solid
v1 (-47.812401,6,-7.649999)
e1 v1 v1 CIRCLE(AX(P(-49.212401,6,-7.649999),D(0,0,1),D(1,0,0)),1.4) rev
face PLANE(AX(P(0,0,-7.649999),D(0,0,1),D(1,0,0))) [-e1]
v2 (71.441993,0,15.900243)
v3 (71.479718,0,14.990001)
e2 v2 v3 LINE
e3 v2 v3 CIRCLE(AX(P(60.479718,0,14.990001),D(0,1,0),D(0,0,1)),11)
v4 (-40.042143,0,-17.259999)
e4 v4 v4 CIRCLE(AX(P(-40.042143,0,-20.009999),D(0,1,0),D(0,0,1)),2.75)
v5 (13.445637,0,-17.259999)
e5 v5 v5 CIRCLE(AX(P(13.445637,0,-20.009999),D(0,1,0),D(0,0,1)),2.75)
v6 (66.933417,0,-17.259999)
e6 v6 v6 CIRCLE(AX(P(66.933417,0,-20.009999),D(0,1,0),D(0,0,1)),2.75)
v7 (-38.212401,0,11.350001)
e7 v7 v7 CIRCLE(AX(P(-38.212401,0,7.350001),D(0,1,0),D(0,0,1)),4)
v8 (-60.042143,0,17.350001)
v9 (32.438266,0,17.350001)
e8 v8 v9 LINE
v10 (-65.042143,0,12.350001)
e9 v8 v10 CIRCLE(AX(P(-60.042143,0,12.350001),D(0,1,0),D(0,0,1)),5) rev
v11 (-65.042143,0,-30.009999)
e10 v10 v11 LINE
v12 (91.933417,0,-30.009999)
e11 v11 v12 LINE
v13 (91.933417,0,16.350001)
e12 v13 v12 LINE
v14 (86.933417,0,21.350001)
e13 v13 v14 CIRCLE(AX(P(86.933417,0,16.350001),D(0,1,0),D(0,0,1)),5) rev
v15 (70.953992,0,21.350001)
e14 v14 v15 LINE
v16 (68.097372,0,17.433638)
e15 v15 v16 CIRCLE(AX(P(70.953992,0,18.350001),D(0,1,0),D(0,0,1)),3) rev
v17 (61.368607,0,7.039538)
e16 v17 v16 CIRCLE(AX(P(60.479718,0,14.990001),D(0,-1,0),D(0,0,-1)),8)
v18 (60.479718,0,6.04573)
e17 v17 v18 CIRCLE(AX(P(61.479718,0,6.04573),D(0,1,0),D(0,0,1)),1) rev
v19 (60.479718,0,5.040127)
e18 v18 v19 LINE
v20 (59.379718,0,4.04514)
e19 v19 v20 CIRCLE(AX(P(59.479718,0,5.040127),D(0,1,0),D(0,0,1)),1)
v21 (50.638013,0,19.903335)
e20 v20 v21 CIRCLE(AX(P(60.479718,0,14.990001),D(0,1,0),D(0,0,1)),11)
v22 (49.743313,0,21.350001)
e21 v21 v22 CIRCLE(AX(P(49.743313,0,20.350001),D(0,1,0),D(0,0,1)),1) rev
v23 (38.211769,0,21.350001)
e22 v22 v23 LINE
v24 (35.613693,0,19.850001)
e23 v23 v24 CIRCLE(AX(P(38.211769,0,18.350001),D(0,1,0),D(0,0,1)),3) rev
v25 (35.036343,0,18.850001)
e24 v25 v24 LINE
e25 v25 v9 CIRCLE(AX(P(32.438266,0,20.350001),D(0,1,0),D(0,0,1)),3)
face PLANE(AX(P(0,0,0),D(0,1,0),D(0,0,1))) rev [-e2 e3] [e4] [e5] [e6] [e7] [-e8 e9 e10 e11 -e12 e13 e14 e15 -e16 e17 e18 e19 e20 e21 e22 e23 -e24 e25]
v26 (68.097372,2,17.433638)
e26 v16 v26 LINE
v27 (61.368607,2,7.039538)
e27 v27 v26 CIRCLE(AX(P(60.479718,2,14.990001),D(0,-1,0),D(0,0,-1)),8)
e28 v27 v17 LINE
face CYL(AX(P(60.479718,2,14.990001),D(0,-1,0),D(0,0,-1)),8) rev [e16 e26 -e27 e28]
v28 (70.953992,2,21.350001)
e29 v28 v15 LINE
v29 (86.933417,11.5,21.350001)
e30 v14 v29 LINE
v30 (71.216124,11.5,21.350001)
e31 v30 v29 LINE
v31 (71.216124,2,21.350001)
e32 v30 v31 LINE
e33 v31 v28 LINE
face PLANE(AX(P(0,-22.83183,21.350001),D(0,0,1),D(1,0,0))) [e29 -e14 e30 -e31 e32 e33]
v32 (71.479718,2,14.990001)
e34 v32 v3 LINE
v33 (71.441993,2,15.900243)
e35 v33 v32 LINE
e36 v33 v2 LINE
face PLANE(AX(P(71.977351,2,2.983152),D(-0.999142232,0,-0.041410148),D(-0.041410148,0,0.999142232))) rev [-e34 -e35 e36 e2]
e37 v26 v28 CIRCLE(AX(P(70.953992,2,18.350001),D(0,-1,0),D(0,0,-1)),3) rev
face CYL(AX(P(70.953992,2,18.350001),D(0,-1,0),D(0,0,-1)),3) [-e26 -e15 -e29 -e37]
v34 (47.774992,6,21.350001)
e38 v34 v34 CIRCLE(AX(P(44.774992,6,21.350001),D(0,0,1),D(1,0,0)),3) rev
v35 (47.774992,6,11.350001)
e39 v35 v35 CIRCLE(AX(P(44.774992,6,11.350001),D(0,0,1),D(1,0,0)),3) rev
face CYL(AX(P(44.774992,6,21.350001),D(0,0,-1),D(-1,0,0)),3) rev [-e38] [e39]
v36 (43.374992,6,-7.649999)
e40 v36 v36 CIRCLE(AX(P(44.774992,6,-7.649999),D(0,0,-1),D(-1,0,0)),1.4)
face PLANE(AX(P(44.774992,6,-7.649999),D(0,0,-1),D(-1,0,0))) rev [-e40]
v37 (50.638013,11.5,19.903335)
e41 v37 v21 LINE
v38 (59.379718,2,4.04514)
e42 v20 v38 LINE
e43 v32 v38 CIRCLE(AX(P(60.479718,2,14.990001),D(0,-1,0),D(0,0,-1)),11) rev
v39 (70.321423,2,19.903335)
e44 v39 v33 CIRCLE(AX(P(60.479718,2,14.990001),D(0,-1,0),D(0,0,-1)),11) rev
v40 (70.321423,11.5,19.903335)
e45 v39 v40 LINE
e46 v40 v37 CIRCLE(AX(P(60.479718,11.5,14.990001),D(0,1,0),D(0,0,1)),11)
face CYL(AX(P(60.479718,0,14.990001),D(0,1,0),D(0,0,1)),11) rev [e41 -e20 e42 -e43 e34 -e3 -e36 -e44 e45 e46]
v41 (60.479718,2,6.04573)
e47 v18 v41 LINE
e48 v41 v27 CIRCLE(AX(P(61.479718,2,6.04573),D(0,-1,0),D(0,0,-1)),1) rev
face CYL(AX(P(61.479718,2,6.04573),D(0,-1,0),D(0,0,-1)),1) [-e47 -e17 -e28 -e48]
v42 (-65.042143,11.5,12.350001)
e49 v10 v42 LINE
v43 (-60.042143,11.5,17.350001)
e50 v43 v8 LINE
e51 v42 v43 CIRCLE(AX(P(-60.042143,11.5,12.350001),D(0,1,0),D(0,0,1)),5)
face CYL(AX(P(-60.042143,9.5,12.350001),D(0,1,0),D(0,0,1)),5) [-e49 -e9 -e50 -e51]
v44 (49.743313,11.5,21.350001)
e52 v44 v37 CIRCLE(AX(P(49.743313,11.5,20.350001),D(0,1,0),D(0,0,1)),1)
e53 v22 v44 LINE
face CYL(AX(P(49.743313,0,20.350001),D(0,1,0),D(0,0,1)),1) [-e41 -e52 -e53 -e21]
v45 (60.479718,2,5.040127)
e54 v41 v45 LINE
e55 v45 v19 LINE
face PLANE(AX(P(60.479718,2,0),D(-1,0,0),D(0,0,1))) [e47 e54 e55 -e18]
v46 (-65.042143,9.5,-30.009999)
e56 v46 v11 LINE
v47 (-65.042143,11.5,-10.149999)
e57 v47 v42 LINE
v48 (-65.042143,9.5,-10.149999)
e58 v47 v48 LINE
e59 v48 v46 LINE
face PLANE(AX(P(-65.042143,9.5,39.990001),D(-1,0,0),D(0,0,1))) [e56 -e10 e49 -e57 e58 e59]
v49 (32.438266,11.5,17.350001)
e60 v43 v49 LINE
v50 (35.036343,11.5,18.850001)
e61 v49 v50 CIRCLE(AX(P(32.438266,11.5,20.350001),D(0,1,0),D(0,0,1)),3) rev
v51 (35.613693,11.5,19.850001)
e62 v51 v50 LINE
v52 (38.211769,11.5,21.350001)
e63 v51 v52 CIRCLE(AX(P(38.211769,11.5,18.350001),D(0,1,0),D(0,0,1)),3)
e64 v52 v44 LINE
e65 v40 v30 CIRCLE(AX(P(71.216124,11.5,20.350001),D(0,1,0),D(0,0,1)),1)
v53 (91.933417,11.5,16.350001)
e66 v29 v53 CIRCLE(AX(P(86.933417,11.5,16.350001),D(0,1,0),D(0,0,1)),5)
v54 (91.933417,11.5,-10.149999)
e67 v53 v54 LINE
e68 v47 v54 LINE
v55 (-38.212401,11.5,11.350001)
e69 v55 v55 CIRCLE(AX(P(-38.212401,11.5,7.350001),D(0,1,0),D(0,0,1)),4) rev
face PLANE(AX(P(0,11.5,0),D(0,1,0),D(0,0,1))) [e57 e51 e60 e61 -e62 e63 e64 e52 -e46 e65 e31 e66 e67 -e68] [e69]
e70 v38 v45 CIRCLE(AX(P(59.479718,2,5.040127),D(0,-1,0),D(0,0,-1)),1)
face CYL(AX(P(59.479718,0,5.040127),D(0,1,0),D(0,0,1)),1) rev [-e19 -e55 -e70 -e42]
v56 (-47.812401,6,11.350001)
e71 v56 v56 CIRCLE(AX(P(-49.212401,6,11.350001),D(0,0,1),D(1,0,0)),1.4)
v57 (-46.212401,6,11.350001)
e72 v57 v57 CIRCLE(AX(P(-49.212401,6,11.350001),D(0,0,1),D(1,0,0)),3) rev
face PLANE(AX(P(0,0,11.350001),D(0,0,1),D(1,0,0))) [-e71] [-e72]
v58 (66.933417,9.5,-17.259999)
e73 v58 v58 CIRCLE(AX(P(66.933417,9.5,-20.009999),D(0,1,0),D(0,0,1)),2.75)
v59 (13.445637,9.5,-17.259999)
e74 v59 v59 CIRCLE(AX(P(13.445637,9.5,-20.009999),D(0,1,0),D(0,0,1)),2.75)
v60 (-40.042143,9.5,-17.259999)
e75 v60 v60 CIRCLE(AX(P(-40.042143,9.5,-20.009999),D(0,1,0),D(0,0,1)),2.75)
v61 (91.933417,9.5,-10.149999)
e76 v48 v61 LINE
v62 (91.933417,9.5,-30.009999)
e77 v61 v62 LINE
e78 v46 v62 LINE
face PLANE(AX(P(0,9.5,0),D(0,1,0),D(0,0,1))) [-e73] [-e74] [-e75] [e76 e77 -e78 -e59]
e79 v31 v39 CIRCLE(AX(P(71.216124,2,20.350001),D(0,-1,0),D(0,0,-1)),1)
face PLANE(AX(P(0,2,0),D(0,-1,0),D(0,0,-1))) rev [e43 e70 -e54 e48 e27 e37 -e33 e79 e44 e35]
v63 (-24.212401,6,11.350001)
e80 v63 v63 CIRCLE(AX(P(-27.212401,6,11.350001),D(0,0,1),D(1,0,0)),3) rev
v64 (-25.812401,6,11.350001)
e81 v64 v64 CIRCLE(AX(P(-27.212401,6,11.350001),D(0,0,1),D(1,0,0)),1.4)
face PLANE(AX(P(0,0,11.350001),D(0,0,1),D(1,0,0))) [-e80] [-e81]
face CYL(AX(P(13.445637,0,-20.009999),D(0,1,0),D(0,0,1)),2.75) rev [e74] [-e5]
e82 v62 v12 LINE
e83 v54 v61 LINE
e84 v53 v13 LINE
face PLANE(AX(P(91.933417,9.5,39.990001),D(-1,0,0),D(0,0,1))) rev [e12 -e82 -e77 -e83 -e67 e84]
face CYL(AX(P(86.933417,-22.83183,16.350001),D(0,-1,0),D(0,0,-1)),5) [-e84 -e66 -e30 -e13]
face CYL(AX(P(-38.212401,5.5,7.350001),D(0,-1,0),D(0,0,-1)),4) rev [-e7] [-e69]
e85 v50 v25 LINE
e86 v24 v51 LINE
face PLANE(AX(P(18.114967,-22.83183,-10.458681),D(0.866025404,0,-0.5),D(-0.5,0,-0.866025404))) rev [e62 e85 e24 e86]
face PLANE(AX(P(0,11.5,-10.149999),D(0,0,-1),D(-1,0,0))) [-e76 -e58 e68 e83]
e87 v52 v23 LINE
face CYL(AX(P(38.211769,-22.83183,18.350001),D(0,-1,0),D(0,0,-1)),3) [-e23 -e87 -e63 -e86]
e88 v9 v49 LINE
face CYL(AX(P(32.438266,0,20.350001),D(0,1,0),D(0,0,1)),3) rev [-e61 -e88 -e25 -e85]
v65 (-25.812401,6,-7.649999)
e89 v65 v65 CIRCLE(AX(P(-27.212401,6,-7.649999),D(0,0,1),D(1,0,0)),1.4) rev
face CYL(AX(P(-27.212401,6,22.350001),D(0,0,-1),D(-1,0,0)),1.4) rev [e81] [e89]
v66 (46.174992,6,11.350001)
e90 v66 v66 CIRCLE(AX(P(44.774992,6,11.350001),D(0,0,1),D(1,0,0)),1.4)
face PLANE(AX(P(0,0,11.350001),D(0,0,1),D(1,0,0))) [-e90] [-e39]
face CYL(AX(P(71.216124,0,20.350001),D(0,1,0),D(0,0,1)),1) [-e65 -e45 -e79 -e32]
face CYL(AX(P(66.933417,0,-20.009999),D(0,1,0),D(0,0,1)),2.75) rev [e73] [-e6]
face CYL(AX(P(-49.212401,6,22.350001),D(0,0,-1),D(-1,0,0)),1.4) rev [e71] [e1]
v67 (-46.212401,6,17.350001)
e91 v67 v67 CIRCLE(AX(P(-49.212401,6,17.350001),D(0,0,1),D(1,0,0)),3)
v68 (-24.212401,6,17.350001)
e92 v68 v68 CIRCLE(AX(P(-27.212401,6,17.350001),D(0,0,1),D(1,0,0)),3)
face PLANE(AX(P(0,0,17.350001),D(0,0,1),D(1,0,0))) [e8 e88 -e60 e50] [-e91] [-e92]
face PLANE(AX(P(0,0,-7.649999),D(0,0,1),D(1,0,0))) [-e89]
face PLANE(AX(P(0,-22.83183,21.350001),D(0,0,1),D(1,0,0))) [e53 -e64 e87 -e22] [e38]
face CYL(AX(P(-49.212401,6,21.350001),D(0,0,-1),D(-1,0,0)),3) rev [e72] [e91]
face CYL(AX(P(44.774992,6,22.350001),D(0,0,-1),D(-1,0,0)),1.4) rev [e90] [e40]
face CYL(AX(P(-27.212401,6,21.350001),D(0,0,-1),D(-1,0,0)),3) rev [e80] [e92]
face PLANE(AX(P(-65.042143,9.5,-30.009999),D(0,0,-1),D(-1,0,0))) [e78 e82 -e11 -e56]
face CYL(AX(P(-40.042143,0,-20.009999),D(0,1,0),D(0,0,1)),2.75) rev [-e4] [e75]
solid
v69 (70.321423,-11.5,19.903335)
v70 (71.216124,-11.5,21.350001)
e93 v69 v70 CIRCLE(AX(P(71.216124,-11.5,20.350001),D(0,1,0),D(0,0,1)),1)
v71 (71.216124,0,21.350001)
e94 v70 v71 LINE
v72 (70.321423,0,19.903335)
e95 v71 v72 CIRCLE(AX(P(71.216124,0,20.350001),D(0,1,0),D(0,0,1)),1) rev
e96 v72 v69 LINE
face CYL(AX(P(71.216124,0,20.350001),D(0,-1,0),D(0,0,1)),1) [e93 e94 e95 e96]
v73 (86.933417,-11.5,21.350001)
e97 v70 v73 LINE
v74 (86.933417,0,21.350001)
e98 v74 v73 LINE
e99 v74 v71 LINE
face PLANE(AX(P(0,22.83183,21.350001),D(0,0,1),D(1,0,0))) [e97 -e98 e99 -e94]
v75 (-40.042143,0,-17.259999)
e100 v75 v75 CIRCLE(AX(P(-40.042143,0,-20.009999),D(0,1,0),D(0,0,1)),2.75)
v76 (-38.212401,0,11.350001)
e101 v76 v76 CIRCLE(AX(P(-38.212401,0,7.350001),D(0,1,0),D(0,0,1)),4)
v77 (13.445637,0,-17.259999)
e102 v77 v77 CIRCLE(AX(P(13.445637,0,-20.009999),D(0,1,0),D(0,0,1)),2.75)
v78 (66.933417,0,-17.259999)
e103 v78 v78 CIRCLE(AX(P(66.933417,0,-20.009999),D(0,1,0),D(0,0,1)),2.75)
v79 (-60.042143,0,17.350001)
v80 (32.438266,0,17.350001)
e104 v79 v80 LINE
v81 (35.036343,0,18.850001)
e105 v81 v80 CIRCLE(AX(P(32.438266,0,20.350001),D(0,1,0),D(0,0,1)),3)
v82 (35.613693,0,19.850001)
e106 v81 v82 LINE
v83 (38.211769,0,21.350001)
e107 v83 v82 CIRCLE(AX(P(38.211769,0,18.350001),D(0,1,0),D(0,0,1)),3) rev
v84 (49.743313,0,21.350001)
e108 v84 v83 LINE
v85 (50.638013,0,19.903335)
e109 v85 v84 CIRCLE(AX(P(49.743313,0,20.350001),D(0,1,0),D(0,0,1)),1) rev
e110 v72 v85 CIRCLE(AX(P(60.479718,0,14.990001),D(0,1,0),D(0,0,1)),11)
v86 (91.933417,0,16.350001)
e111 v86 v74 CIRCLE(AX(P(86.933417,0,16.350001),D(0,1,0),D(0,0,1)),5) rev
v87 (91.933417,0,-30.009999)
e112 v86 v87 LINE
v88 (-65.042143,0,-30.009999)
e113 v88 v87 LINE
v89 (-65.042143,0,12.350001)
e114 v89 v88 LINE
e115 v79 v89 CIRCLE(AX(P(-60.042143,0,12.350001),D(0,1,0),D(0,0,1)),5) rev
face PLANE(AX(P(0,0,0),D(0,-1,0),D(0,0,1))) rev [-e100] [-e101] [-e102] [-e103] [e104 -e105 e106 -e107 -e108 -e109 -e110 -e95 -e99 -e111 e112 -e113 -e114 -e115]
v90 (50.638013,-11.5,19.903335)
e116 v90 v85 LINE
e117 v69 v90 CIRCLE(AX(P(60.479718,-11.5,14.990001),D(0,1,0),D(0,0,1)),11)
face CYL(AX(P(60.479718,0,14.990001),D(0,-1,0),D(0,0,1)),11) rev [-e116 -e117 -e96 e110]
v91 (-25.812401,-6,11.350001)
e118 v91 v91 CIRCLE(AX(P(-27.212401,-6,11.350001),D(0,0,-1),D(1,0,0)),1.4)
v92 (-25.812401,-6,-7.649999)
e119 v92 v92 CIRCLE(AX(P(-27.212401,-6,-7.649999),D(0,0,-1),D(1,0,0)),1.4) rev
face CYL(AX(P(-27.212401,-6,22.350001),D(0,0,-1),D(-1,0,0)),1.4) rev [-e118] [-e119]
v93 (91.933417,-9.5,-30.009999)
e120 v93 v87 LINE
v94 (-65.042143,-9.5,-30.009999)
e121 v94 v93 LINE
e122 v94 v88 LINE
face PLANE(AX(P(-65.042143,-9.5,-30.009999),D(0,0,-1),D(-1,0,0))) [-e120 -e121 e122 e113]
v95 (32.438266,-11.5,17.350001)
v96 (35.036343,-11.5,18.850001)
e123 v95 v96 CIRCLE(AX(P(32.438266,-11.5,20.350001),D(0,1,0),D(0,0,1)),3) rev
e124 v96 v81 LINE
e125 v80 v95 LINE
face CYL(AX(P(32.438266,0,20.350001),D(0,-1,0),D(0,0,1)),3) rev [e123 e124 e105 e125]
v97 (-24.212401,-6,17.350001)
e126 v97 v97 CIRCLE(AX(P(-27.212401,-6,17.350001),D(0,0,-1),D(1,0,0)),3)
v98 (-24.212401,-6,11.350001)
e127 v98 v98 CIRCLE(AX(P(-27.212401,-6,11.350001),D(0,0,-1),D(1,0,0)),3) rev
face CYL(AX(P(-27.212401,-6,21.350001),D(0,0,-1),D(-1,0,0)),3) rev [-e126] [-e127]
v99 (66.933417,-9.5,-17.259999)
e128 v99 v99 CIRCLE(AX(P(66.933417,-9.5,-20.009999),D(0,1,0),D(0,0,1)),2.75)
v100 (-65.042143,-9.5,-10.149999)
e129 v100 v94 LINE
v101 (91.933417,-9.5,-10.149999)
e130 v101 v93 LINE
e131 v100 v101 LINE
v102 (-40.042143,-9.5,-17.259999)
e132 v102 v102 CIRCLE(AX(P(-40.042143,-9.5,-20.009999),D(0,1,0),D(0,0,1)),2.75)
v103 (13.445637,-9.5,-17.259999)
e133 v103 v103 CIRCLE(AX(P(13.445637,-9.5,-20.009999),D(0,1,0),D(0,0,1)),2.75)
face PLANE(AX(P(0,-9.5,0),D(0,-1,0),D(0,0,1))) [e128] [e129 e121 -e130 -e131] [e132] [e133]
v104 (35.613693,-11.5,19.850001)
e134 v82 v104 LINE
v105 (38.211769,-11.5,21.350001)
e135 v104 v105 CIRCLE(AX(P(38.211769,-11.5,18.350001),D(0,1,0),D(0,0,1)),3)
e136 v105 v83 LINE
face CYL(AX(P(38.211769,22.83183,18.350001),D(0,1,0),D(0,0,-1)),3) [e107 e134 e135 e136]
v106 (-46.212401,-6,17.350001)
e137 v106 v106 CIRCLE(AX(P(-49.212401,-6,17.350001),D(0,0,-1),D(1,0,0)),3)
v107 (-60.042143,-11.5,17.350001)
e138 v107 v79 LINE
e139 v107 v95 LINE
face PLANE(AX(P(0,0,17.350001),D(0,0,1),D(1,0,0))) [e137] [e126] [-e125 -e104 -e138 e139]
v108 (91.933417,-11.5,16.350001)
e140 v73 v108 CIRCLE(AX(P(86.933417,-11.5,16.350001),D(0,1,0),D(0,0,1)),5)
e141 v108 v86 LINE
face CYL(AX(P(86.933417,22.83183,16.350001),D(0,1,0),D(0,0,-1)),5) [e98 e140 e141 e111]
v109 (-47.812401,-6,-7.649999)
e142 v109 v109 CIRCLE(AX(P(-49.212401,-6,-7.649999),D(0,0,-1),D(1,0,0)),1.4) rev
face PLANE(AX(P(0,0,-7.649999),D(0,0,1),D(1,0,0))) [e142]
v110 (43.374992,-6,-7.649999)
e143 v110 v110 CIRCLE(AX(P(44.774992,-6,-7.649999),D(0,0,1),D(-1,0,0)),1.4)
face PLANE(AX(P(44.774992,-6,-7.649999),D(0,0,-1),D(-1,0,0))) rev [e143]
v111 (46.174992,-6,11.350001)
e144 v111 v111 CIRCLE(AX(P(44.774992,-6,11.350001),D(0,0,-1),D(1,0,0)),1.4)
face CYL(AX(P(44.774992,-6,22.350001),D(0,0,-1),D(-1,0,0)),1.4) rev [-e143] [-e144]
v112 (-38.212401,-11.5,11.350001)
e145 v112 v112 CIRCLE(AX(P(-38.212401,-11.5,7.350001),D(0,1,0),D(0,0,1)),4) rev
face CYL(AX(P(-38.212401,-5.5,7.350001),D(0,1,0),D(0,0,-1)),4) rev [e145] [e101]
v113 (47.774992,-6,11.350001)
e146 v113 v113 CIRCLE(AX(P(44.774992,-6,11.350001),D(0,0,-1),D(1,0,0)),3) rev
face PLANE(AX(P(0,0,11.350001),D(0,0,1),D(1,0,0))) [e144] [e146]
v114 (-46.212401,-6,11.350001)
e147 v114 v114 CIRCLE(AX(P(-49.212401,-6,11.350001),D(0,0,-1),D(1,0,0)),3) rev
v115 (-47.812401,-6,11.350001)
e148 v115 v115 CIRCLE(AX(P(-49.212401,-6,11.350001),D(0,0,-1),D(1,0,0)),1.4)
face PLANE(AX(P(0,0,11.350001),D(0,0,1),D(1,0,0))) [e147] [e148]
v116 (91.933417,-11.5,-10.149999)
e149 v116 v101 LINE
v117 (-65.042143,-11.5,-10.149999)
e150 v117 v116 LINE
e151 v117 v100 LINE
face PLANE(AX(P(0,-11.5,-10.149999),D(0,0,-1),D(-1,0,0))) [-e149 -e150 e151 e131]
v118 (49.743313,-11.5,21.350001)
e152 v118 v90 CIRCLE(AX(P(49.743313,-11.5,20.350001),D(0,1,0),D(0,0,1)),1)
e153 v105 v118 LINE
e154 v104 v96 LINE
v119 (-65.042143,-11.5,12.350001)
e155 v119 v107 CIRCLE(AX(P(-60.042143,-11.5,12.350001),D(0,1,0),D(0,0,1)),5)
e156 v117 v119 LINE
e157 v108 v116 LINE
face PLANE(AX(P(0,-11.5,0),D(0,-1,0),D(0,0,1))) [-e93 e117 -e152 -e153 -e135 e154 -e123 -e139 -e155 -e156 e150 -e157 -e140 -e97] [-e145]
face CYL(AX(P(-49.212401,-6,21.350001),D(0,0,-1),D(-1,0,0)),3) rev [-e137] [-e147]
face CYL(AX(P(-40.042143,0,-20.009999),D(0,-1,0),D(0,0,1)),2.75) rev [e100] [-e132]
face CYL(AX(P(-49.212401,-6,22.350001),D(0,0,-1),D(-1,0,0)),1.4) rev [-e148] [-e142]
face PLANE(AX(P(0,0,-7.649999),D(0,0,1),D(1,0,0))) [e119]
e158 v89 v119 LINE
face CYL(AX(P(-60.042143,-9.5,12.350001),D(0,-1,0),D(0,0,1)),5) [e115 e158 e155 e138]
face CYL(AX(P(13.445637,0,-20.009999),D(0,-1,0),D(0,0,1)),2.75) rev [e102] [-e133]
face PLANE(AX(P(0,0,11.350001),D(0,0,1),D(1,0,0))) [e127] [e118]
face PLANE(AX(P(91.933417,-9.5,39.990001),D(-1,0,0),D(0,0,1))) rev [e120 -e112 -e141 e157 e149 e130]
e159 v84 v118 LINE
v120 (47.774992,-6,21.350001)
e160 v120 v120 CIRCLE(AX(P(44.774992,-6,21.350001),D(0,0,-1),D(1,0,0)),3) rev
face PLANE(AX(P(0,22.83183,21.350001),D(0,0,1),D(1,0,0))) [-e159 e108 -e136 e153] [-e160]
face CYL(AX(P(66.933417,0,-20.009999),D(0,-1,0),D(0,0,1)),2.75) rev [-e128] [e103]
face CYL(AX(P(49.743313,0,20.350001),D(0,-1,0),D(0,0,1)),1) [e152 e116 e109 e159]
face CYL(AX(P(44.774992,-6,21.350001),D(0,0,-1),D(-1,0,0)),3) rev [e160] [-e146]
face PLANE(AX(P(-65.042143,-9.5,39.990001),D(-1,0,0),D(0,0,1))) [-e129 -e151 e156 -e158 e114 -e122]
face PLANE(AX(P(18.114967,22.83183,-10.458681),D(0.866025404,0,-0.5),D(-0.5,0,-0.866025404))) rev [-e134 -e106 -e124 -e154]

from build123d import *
from build123d.topology import SkipClean

# Parameters (mm, degrees)
SKETCH1_R                = 10
SKETCH1_R_2              = 4
BOSS_EXTRUDE1_DEPTH      = 5.5
BOSS_EXTRUDE2_START      = -9.5
BOSS_EXTRUDE2_OUTLINE_W  = 156.975559889
BOSS_EXTRUDE2_OUTLINE_H  = 70
BOSS_EXTRUDE2_OUTLINE_R  = 4
BOSS_EXTRUDE2_DEPTH      = 9.5
BOSS_EXTRUDE3_START      = -2
BOSS_EXTRUDE3_OUTLINE_W  = 156.975559889
BOSS_EXTRUDE3_OUTLINE_H  = 50.14
BOSS_EXTRUDE3_OUTLINE_R  = 4
BOSS_EXTRUDE3_DEPTH      = 2
SKETCH3_R                = 11
CUT_EXTRUDE1_DEPTH       = 101.911859603
SKETCH10_R               = 2.75
CUT_EXTRUDE43_DEPTH      = 101.703542185
CUT_EXTRUDE48_START      = 10
SKETCH13_W               = 179.362080376
SKETCH13_H               = 98.006622084
CUT_EXTRUDE48_DEPTH      = 30
BOSS_EXTRUDE4_DEPTH      = 11.5
CUT_EXTRUDE42_START      = -4
SKETCH8_R                = 3
SKETCH8_R_2              = 1.4
CUT_EXTRUDE42_DEPTH      = 347.611394255
CUT_EXTRUDE44_DEPTH      = 15
CUT_EXTRUDE44_DEPTH_BACK = 15
SKETCH8_3_R              = 1.4
FILLET2_R                = 3
FILLET3_R                = 1
FILLET4_R                = 5
BOSS_EXTRUDE5_START      = -2
BOSS_EXTRUDE5_DEPTH      = 2
FILLET5_R                = 3
FILLET6_R                = 1


# Read off the part's stored shape, not the designer's step: Boss-Extrude2, Boss-Extrude3
with BuildPart() as part:
    # Sketch1 → Boss-Extrude1 (new body)
    with BuildSketch(Plane(origin=(0, 0, 0), x_dir=(1, 0, 0), z_dir=(0, 1, 0))):
        with Locations(Location((-38.212401265, -7.350001428, 0), (0, 0, 270))):
            Circle(SKETCH1_R)
        with Locations(Location((-38.212401265, -7.350001428, 0), (0, 0, 270))):
            Circle(SKETCH1_R_2, mode=Mode.SUBTRACT)
    extrude(amount=BOSS_EXTRUDE1_DEPTH)

    # Boss-Extrude2 outline → Boss-Extrude2 (add)
    with BuildSketch(Plane.XZ.offset(BOSS_EXTRUDE2_START)):
        with Locations((13.445637236, 4.990001428)):
            Rectangle(BOSS_EXTRUDE2_OUTLINE_W, BOSS_EXTRUDE2_OUTLINE_H)
        with Locations((-38.212401265, 7.350001428)):
            Circle(BOSS_EXTRUDE2_OUTLINE_R, mode=Mode.SUBTRACT)
    extrude(amount=BOSS_EXTRUDE2_DEPTH)

    # Boss-Extrude3 outline → Boss-Extrude3 (add)
    with BuildSketch(Plane.XZ.offset(-9.5).offset(BOSS_EXTRUDE3_START)):
        with Locations((13.445637236, 14.920001428)):
            Rectangle(BOSS_EXTRUDE3_OUTLINE_W, BOSS_EXTRUDE3_OUTLINE_H)
        with Locations((-38.212401265, 7.350001428)):
            Circle(BOSS_EXTRUDE3_OUTLINE_R, mode=Mode.SUBTRACT)
    extrude(amount=BOSS_EXTRUDE3_DEPTH)

    # Sketch3 → Cut-Extrude1 (cut, through all)
    with BuildSketch(Plane(origin=(0, 11.5, 0), x_dir=(1, 0, 0), z_dir=(0, 1, 0))):
        with Locations(Location((60.479718282, -14.990001428, 0), (0, 0, 270))):
            Circle(SKETCH3_R)
    extrude(amount=-CUT_EXTRUDE1_DEPTH, mode=Mode.SUBTRACT)

    # Sketch10 → Cut-Extrude43 (cut, through all)
    with BuildSketch(Plane(origin=(0, 9.5, 0), x_dir=(1, 0, 0), z_dir=(0, 1, 0))):
        with Locations(Location((66.93341718, 20.009998572, 0), (0, 0, 270))):
            Circle(SKETCH10_R)
        with Locations(Location((-40.042142709, 20.009998572, 0), (0, 0, 270))):
            Circle(SKETCH10_R)
        with Locations(Location((13.445637235, 20.009998572, 0), (0, 0, 270))):
            Circle(SKETCH10_R)
    extrude(amount=-CUT_EXTRUDE43_DEPTH, mode=Mode.SUBTRACT)

    # Sketch13 → Cut-Extrude48 (cut)
    with BuildSketch(Plane.XY.offset(7.350001428).offset(CUT_EXTRUDE48_START)):
        with Locations((17.955760485, -15.688862508)):
            Rectangle(SKETCH13_W, SKETCH13_H)
    extrude(amount=CUT_EXTRUDE48_DEPTH, mode=Mode.SUBTRACT)

    # Sketch16 → Boss-Extrude4 (add)
    with SkipClean():  # the faces are left unmerged after this step: merging them gives an invalid solid
        with BuildSketch(Plane(origin=(0, 11.5, 0), x_dir=(1, 0, 0), z_dir=(0, 1, 0))):
            with BuildLine():
                Line((34.170317205, -17.350001428), (36.479718282, -21.350001428))
                Line((36.479718282, -21.350001428), (51.504730817, -21.350001428))
                ThreePointArc((51.504730817, -21.350001428), (50.419490762, -19.43880152), (49.735864225, -17.350001428))
                Line((49.735864225, -17.350001428), (34.170317205, -17.350001428))
            make_face()
            with BuildLine():
                ThreePointArc((71.223572339, -17.350001428), (70.539945801, -19.43880152), (69.454705747, -21.350001428))
                Line((69.454705747, -21.350001428), (91.93341718, -21.350001428))
                Line((91.93341718, -21.350001428), (91.93341718, -17.350001428))
                Line((91.93341718, -17.350001428), (71.223572339, -17.350001428))
            make_face()
        extrude(amount=-BOSS_EXTRUDE4_DEPTH)

    # Sketch8 → Cut-Extrude42 (cut, through all)
    # profile 1 of 3: a face of its own
    with SkipClean():  # the faces are left unmerged after this step: merging them gives an invalid solid
        with BuildSketch(Plane(origin=(283.383358914, 0, 7.350001428), x_dir=(-1, 0, 0), z_dir=(0, 0, -1)).offset(CUT_EXTRUDE42_START)):
            with Locations(Location((310.595760179, 6, 0), (0, 0, 180))):
                Circle(SKETCH8_R)
            with Locations(Location((310.595760179, 6, 0), (0, 0, 180))):
                Circle(SKETCH8_R_2, mode=Mode.SUBTRACT)
        # profile 2 of 3: a face of its own
        with BuildSketch(Plane(origin=(283.383358914, 0, 7.350001428), x_dir=(-1, 0, 0), z_dir=(0, 0, -1)).offset(CUT_EXTRUDE42_START)):
            with Locations(Location((238.608366736, 6, 0), (0, 0, 180))):
                Circle(SKETCH8_R)
            with Locations(Location((238.608366736, 6, 0), (0, 0, 180))):
                Circle(SKETCH8_R_2, mode=Mode.SUBTRACT)
        # profile 3 of 3: a face of its own
        with BuildSketch(Plane(origin=(283.383358914, 0, 7.350001428), x_dir=(-1, 0, 0), z_dir=(0, 0, -1)).offset(CUT_EXTRUDE42_START)):
            with Locations(Location((332.595760179, 6, 0), (0, 0, 180))):
                Circle(SKETCH8_R)
            with Locations(Location((332.595760179, 6, 0), (0, 0, 180))):
                Circle(SKETCH8_R_2, mode=Mode.SUBTRACT)
        extrude(amount=-CUT_EXTRUDE42_DEPTH, mode=Mode.SUBTRACT)

    # Sketch8<3> → Cut-Extrude44 (cut, two sides: drawn at the far end of the back side and taken through both)
    with SkipClean():  # the faces are left unmerged after this step: merging them gives an invalid solid
        with BuildSketch(Plane(origin=(283.383358914, 0, 7.350001428), x_dir=(-1, 0, 0), z_dir=(0, 0, -1)).offset(-CUT_EXTRUDE44_DEPTH_BACK)):
            with Locations(Location((332.595760179, 6, 0), (0, 0, 180))):
                Circle(SKETCH8_3_R)
            with Locations(Location((310.595760179, 6, 0), (0, 0, 180))):
                Circle(SKETCH8_3_R)
            with Locations((238.608366736, 6)):
                Circle(SKETCH8_3_R)
        extrude(amount=CUT_EXTRUDE44_DEPTH + CUT_EXTRUDE44_DEPTH_BACK, mode=Mode.SUBTRACT)

    # Fillet2
    fillet2_edges = [part.edges().sort_by_distance(p)[0] for p in [
        (34.170317205, 5.75, 17.350001428),
        (36.479718282, 5.75, 21.350001428),
    ]]
    fillet(fillet2_edges, radius=FILLET2_R)

    # Fillet3
    fillet3_edges = [part.edges().sort_by_distance(p)[0] for p in [
        (51.504730817, 5.75, 21.350001428),
        (69.454705747, 5.75, 21.350001428),
    ]]
    fillet(fillet3_edges, radius=FILLET3_R)

    # Fillet4
    # the kernel refuses this fillet: 5 mm, written as the material it takes off along each edge
    with BuildSketch(Plane(origin=(-65.042142709, -12.5, 17.350001428), x_dir=(1, 0, 0), z_dir=(0, 1, 0))) as fillet4_piece_1:
        with BuildLine():
            CenterArc((FILLET4_R, FILLET4_R), FILLET4_R, 180, 90)
            Line((0, FILLET4_R), (0, 0))
            Line((0, 0), (FILLET4_R, 0))
        make_face()
    extrude(amount=36.5, mode=Mode.SUBTRACT)
    with BuildSketch(Plane(origin=(91.93341718, 24, 21.350001428), x_dir=(0, 0, -1), z_dir=(0, -1, 0))) as fillet4_piece_2:
        with BuildLine():
            CenterArc((FILLET4_R, -FILLET4_R), FILLET4_R, 90, 90)
            Line((0, -FILLET4_R), (0, 0))
            Line((0, 0), (FILLET4_R, 0))
        make_face()
    extrude(amount=36.5, mode=Mode.SUBTRACT)


with BuildPart() as body_2:
    # Mirror1: mirrored copy
    add(part.part.mirror(Plane.ZX))


with BuildPart() as part_1:
    add(part.part)

    # Sketch17 → Boss-Extrude5 (add)
    with BuildSketch(Plane.XZ.offset(BOSS_EXTRUDE5_START)):
        with BuildLine():
            ThreePointArc((65.332593718, 21.350001428), (68.05863641, 12.428751733), (60.479718282, 6.990001428))
            Line((60.479718282, 6.990001428), (60.479718282, 3.990001428))
            ThreePointArc((60.479718282, 3.990001428), (68.257892875, 7.211826835), (71.479718282, 14.990001428))
            Line((71.479718282, 14.990001428), (71.441992674, 15.900243231))
            ThreePointArc((71.441992674, 15.900243231), (71.072525944, 17.955203923), (70.321423193, 19.903334762))
            ThreePointArc((70.321423193, 19.903334762), (70.365633584, 20.875992556), (71.216123639, 21.350001428))
            Line((71.216123639, 21.350001428), (65.332593718, 21.350001428))
        make_face()
    extrude(amount=BOSS_EXTRUDE5_DEPTH)

    # Fillet5
    fillet5_edges = [part_1.edges().sort_by_distance(p)[0] for p in [
        (65.332593718, 1, 21.350001428),
    ]]
    fillet(fillet5_edges, radius=FILLET5_R)

    # Fillet6
    fillet6_edges = [part_1.edges().sort_by_distance(p)[0] for p in [
        (60.479718282, 1, 6.990001428),
        (60.479718282, 1, 3.990001428),
    ]]
    fillet(fillet6_edges, radius=FILLET6_R)


solid = Compound([body_2.part, part_1.part])
